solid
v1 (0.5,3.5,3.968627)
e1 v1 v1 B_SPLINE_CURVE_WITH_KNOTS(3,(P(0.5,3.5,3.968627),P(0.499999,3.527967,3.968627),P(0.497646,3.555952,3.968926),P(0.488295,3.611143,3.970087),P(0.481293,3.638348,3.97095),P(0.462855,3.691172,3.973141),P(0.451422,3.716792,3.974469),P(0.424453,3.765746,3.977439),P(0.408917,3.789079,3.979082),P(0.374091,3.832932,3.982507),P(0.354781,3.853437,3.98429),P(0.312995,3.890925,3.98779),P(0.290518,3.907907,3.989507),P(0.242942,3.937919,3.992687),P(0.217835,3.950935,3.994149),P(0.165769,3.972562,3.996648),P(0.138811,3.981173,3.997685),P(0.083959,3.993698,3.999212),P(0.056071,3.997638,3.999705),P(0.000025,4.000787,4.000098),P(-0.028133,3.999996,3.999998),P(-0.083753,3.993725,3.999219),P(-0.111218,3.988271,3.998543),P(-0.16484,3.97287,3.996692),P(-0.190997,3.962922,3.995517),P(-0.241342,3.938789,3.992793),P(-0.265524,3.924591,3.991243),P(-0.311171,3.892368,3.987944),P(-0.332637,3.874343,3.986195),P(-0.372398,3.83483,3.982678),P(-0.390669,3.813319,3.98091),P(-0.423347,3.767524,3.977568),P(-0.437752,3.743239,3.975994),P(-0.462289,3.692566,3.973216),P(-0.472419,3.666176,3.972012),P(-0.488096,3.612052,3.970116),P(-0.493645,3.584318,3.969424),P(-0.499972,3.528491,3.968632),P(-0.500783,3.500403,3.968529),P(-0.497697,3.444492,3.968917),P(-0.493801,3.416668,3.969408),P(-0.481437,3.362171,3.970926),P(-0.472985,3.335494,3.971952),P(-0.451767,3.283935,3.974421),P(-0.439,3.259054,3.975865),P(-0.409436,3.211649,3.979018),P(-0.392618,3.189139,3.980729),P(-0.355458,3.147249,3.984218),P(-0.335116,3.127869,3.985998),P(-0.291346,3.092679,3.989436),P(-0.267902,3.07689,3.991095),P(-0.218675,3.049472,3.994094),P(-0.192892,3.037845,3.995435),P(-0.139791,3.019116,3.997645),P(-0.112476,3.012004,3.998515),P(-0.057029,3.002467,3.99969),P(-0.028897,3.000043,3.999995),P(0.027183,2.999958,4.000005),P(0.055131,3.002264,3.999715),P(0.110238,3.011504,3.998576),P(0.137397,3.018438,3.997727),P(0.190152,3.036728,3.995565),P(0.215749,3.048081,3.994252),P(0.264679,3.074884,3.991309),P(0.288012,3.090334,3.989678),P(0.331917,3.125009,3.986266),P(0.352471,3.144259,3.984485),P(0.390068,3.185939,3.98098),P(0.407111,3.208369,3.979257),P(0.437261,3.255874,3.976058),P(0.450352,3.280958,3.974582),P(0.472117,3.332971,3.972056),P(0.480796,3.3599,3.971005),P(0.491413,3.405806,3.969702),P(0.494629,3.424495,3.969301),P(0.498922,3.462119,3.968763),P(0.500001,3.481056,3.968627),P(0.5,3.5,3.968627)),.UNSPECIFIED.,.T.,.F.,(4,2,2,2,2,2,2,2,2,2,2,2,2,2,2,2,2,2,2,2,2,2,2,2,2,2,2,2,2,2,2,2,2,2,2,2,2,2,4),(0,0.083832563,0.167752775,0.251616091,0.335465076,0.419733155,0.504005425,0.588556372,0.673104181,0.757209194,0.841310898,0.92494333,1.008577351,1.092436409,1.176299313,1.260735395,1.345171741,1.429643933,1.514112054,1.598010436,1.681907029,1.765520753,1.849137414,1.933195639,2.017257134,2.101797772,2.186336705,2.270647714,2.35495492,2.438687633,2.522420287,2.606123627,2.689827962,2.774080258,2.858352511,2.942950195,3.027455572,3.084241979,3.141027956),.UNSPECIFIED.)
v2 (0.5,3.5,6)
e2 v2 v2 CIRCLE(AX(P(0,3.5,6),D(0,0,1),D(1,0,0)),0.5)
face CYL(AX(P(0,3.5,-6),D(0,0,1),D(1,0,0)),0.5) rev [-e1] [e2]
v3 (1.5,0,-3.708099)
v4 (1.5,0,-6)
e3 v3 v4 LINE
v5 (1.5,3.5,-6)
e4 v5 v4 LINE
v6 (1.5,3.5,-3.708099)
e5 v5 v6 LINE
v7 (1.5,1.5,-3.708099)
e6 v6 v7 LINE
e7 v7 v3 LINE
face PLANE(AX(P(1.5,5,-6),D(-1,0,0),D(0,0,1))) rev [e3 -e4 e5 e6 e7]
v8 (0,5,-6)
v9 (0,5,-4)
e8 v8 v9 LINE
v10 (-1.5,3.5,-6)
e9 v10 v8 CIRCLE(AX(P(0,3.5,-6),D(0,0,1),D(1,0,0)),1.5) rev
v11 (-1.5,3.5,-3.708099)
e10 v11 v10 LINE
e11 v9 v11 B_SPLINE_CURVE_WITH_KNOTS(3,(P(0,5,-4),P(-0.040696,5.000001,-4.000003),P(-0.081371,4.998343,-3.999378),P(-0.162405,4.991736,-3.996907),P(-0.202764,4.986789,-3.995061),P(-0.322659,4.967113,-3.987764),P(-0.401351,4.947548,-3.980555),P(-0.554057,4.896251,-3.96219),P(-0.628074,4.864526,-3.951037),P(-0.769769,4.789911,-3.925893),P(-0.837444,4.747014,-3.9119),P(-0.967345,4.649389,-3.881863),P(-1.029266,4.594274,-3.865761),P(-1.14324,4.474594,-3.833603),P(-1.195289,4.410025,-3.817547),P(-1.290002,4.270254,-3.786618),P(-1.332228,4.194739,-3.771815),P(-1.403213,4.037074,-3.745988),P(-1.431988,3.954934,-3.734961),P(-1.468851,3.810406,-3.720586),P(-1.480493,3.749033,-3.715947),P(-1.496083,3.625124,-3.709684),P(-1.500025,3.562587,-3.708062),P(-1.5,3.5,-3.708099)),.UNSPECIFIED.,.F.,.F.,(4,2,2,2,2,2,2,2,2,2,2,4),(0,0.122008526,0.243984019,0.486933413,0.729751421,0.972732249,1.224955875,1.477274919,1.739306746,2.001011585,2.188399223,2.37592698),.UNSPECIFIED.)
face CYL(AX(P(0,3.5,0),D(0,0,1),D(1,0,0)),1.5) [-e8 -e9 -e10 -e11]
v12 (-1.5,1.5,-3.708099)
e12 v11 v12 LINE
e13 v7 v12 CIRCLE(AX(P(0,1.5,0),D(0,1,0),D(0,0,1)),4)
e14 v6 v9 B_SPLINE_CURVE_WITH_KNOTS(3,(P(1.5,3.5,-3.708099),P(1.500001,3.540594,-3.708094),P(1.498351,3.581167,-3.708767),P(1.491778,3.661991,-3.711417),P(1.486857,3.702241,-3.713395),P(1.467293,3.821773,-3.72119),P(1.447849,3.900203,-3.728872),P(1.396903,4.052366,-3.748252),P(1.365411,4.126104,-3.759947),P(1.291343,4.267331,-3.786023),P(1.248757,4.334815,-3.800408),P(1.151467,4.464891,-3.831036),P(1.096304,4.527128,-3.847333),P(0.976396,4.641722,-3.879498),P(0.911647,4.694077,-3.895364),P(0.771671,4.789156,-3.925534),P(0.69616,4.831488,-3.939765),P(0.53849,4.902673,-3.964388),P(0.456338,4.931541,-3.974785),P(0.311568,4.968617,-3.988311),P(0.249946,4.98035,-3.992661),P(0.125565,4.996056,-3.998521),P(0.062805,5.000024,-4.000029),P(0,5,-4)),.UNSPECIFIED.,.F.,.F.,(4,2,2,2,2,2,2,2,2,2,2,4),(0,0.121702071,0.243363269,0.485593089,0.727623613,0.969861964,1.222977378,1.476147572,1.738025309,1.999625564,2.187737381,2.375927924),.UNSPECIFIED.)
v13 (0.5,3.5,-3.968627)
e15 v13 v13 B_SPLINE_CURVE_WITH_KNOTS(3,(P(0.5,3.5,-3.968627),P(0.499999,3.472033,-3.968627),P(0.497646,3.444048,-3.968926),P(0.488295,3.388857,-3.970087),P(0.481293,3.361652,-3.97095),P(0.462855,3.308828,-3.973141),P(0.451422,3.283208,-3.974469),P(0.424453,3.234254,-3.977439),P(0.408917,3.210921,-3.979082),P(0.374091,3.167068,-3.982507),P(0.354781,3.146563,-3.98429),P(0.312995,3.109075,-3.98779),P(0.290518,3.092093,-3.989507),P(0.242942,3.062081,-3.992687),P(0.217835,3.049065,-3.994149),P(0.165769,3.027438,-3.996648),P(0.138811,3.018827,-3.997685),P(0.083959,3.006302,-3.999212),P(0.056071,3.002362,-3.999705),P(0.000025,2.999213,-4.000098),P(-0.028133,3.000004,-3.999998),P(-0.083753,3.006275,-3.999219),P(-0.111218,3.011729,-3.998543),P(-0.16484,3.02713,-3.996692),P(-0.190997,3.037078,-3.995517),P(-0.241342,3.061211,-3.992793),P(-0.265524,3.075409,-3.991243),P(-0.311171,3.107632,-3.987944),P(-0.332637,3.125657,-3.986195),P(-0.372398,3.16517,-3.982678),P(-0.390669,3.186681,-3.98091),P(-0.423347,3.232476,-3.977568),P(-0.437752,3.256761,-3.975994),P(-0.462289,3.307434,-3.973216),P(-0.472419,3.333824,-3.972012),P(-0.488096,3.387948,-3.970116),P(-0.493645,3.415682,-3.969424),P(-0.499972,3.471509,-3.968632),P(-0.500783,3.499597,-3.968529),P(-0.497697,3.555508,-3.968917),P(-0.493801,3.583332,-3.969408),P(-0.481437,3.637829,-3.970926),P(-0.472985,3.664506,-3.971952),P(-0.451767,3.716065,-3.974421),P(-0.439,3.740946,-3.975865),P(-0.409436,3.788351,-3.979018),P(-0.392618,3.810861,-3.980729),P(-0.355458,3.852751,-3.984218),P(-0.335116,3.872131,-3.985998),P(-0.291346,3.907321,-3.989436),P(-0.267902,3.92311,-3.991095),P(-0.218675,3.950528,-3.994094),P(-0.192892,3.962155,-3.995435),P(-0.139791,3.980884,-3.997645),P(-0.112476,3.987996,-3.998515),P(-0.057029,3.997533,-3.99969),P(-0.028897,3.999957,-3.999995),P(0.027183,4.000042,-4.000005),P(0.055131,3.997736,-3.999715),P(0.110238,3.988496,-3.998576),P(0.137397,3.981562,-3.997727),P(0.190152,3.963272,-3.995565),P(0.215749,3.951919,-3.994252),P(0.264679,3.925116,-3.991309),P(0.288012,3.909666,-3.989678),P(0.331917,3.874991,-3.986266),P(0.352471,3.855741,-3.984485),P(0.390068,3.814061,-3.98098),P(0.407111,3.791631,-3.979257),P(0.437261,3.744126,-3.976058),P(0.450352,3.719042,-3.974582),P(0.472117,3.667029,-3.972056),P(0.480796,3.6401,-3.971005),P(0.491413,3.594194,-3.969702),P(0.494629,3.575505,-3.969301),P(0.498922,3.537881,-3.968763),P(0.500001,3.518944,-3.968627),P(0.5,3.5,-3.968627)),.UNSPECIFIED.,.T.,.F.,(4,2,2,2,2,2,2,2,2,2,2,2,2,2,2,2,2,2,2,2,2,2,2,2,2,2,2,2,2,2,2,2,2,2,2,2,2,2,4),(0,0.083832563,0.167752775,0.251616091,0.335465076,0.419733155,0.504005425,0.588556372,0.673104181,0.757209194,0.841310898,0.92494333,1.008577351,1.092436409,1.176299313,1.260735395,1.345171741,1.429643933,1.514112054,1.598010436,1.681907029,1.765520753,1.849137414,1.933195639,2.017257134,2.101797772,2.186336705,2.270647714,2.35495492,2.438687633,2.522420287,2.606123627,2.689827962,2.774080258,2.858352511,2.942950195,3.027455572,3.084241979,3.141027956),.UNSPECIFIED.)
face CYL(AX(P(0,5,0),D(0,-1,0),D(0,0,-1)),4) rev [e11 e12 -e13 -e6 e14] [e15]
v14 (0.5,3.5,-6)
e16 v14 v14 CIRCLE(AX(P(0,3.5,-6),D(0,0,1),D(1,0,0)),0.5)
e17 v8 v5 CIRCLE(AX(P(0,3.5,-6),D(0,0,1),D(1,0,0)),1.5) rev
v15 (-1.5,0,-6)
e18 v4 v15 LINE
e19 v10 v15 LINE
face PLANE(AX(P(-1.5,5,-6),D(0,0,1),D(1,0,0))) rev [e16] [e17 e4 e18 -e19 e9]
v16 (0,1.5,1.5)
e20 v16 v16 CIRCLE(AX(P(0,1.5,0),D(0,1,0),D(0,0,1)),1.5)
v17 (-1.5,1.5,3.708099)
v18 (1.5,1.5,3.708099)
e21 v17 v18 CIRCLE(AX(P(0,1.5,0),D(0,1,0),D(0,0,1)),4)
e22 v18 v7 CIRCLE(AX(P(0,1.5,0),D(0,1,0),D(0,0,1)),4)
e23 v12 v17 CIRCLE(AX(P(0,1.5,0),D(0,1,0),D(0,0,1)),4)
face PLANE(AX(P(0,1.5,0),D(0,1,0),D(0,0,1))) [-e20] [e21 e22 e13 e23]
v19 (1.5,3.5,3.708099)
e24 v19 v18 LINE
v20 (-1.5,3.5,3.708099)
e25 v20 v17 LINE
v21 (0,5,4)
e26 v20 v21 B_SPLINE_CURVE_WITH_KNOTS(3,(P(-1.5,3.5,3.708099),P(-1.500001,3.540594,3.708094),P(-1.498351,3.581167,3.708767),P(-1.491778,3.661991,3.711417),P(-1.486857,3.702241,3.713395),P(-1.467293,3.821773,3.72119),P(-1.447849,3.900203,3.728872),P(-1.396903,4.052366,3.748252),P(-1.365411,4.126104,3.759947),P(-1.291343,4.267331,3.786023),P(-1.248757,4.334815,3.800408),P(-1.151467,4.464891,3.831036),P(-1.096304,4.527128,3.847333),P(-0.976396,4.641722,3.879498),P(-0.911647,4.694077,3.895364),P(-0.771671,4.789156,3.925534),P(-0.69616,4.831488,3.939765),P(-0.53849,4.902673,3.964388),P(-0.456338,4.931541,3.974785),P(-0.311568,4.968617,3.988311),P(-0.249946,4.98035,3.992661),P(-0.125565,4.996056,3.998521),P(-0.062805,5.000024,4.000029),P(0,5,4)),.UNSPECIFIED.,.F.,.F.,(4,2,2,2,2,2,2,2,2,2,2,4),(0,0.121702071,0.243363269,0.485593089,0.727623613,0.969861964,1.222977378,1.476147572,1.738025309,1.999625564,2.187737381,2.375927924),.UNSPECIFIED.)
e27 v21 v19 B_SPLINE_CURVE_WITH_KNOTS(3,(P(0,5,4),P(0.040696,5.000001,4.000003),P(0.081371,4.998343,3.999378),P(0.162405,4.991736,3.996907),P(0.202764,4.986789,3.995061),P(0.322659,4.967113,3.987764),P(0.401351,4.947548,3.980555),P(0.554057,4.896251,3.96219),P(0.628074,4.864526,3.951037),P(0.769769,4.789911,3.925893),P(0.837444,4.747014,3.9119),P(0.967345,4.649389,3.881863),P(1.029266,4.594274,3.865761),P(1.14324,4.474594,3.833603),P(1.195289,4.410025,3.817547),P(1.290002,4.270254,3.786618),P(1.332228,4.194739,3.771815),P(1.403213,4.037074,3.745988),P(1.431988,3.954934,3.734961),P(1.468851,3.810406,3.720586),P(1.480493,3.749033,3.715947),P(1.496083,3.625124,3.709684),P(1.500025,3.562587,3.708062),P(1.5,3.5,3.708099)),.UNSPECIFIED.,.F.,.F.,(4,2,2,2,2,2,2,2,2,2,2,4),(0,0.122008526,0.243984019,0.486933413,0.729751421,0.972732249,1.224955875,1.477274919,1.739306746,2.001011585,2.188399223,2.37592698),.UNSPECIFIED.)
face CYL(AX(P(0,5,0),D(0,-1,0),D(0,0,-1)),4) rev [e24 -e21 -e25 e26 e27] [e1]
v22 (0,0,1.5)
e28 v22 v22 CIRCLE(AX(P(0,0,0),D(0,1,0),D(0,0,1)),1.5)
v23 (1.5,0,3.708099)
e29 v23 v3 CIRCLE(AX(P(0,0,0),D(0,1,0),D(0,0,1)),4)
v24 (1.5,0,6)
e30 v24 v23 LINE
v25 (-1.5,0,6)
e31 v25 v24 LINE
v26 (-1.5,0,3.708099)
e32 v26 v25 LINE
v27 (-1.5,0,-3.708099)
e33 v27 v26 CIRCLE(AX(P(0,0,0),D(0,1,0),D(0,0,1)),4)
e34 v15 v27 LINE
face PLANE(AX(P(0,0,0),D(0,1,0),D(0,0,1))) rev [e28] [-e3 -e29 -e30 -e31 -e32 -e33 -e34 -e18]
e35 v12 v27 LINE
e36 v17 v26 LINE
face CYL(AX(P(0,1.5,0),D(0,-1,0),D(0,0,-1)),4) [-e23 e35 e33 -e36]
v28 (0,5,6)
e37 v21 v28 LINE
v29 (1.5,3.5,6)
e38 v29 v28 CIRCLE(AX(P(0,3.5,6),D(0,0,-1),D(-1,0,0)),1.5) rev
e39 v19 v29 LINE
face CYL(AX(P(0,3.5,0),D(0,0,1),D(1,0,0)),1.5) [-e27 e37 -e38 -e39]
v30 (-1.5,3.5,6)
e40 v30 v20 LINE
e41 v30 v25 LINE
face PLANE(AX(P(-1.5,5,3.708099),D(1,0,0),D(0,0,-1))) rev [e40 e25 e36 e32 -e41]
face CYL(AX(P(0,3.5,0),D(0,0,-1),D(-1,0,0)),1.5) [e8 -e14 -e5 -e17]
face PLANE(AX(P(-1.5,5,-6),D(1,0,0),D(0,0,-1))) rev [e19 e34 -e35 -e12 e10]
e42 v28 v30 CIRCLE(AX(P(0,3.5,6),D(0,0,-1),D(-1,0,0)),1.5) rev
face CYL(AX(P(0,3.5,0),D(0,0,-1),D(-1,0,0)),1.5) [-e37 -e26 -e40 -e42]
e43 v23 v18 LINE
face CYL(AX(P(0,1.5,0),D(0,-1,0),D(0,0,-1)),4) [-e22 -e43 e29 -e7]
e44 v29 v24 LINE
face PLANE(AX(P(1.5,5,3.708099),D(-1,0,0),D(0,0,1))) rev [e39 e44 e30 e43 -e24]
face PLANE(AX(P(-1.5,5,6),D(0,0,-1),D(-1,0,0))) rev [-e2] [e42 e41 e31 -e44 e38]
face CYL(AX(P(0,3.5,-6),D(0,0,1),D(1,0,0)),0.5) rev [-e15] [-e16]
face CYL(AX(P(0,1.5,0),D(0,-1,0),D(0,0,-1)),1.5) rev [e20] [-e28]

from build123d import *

# Parameters (mm, degrees)
SKETCH1_R           = 4
SKETCH1_R_2         = 1.5
BOSS_EXTRUDE1_DEPTH = 1.5
BOSS_EXTRUDE2_DEPTH = 5
SKETCH4_R           = 0.5
CUT_EXTRUDE1_DEPTH  = 14.601470509
FILLET1_R           = 1.5


with BuildPart() as part:
    # Sketch1 → Boss-Extrude1 (new body)
    with BuildSketch(Plane(origin=(0, 0, 0), x_dir=(1, 0, 0), z_dir=(0, 1, 0))):
        with Locations(Location((0, 0, 0), (0, 0, 270))):
            Circle(SKETCH1_R)
        with Locations(Location((0, 0, 0), (0, 0, 270))):
            Circle(SKETCH1_R_2, mode=Mode.SUBTRACT)
    extrude(amount=BOSS_EXTRUDE1_DEPTH)

    # Sketch3 → Boss-Extrude2 (add)
    with BuildSketch(Plane(origin=(0, 0, 0), x_dir=(1, 0, 0), z_dir=(0, 1, 0))):
        with BuildLine():
            Line((-1.5, -3.708099244), (-1.5, -6))
            Line((-1.5, -6), (1.5, -6))
            Line((1.5, -6), (1.5, -3.708099244))
            ThreePointArc((1.5, -3.708099244), (0, -4), (-1.5, -3.708099244))
        make_face()
        with BuildLine():
            Line((-1.5, 6), (1.5, 6))
            Line((1.5, 6), (1.5, 3.708099244))
            ThreePointArc((1.5, 3.708099244), (0, 4), (-1.5, 3.708099244))
            Line((-1.5, 3.708099244), (-1.5, 6))
        make_face()
    extrude(amount=BOSS_EXTRUDE2_DEPTH)

    # Sketch4 → Cut-Extrude1 (cut, through all)
    with BuildSketch(Plane.XY.offset(6)):
        with Locations((0, 3.5)):
            Circle(SKETCH4_R)
    extrude(amount=-CUT_EXTRUDE1_DEPTH, mode=Mode.SUBTRACT)

    # Fillet1
    fillet1_edges = [part.edges().sort_by_distance(p)[0] for p in [
        (1.5, 5, 4.854049622),
        (-1.5, 5, 4.854049622),
        (1.5, 5, -4.854049622),
        (-1.5, 5, -4.854049622),
    ]]
    fillet(fillet1_edges, radius=FILLET1_R - 0.0001)  # a hair under: the kernel refuses the full size


solid = part.part
